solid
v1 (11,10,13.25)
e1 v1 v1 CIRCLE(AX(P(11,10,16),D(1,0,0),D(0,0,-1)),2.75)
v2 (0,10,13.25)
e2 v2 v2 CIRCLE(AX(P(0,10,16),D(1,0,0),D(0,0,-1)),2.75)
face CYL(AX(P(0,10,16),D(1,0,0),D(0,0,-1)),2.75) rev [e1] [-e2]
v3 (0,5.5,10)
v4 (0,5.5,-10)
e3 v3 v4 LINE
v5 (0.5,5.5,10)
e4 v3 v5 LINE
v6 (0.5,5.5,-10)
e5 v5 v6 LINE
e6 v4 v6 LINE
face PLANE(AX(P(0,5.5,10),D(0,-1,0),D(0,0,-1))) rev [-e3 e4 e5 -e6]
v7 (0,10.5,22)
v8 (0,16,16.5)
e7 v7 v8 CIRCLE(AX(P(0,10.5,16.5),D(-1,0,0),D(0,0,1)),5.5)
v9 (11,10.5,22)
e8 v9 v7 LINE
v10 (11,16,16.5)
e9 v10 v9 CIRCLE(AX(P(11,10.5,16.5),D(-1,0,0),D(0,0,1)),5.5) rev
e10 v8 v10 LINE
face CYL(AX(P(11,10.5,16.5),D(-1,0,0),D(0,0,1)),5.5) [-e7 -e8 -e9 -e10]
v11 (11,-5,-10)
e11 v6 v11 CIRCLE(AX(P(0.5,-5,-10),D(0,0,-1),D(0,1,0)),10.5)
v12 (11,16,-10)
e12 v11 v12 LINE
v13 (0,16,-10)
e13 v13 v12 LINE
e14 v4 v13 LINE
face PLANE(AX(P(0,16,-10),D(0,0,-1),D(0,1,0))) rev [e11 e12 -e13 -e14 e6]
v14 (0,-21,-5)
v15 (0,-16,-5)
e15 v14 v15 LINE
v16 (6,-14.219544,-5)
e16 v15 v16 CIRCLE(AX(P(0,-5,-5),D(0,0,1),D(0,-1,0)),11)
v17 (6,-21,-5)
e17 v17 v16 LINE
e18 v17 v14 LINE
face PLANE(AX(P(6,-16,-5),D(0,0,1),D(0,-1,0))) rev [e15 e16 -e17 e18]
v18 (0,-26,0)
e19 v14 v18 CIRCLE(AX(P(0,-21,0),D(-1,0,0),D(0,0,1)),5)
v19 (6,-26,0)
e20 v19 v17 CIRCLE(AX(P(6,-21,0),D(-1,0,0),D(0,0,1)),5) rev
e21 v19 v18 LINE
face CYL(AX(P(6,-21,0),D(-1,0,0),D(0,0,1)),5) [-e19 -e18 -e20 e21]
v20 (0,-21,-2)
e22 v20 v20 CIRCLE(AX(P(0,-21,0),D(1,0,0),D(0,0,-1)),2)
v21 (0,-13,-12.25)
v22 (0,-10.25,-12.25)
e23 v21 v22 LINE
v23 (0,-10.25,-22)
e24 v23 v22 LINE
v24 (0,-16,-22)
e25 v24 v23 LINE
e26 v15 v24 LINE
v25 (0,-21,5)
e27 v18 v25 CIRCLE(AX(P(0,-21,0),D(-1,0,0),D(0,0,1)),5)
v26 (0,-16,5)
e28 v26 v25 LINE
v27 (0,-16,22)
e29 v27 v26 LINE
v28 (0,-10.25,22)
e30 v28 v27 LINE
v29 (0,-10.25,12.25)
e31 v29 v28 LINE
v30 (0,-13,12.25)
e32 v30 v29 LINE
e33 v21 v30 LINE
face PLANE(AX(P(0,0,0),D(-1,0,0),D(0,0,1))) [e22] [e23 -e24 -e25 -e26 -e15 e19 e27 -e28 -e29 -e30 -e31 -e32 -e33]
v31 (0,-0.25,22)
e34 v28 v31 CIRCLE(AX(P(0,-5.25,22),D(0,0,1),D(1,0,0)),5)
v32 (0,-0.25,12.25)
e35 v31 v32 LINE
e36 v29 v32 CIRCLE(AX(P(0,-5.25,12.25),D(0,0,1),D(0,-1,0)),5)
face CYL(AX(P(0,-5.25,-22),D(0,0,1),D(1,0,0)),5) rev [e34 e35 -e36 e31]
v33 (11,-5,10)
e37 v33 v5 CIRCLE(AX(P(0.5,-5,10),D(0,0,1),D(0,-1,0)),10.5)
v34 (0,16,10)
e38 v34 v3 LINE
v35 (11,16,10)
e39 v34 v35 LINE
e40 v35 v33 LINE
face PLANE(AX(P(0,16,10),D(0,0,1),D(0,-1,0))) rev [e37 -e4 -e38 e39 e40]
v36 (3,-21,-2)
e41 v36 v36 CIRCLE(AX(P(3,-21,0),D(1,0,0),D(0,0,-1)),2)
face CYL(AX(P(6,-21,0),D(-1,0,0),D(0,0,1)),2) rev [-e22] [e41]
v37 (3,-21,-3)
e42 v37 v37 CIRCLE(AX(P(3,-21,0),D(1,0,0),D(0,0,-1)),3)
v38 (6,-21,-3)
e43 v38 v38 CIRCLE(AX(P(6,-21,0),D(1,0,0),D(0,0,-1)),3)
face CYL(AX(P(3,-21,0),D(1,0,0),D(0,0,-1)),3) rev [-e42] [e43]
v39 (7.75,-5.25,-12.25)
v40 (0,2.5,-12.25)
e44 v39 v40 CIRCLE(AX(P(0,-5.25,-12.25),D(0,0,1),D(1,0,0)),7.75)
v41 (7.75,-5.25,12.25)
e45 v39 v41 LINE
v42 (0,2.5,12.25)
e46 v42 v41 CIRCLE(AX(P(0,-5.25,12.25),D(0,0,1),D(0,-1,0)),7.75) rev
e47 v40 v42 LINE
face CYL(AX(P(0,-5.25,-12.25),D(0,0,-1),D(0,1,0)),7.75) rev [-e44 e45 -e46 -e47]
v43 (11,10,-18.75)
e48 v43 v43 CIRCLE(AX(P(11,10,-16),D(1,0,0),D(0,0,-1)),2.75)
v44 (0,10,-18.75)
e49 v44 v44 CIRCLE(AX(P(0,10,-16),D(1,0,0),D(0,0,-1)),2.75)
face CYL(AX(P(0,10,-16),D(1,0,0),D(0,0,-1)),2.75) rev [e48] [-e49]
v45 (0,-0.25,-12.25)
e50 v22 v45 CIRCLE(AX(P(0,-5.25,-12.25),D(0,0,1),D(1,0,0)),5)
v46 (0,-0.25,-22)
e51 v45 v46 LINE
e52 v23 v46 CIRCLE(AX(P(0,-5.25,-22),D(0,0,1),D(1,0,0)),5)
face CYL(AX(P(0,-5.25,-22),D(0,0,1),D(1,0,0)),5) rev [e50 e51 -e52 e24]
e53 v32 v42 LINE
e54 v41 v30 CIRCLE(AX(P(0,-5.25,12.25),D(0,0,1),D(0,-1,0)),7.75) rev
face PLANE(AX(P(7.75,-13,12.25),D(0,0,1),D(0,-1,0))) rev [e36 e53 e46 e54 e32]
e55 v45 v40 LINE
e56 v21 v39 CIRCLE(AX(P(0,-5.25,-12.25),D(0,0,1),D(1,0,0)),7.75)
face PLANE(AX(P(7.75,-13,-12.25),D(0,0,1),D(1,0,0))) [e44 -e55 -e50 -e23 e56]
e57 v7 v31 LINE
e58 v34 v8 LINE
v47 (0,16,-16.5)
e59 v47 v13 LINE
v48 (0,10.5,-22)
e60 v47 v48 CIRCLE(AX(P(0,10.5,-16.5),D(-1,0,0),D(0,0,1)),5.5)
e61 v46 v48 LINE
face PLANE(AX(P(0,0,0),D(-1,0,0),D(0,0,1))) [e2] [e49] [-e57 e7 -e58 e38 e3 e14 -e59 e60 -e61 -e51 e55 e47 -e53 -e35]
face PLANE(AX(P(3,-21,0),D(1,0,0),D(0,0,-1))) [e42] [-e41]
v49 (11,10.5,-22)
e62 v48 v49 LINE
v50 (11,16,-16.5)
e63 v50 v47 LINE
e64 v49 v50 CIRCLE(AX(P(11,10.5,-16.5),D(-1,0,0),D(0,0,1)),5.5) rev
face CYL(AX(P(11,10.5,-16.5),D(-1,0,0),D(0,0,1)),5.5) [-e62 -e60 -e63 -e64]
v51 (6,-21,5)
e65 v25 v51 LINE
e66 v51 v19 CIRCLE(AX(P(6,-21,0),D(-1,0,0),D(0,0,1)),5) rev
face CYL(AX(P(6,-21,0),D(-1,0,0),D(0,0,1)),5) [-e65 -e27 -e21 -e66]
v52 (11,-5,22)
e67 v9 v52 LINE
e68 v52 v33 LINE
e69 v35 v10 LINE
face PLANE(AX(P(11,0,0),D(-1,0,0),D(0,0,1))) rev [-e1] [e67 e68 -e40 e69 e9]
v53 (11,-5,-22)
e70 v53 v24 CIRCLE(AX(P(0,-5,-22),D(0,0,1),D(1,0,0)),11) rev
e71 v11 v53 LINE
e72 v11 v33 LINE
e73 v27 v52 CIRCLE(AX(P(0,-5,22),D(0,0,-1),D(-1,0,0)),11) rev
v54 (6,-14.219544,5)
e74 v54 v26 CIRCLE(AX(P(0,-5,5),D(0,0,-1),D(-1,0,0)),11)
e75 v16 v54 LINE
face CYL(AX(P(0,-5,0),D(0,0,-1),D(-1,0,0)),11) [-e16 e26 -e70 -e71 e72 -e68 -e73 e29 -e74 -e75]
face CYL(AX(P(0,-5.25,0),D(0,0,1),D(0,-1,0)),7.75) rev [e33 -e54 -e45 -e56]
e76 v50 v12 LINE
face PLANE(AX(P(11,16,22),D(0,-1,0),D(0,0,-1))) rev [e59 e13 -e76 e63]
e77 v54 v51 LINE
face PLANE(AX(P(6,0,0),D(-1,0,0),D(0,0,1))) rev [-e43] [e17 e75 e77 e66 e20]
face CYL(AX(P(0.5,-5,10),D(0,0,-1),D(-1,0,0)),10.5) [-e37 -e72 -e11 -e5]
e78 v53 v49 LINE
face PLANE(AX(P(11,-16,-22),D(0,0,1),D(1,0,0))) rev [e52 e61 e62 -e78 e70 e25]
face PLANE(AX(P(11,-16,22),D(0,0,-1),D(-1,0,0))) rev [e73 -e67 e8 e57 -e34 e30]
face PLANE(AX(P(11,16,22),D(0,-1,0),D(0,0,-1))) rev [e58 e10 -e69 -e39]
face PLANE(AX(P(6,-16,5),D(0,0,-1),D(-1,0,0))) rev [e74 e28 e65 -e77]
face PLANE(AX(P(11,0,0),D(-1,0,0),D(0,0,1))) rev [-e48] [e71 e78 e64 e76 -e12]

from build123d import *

# Parameters (mm, degrees)
SKETCH1_W               = 44
SKETCH1_H               = 32
BOSS_EXTRUDE1_DEPTH     = 11
SKETCH2_W               = 24.5
SKETCH2_H               = 15.5
CUT_EXTRUDE1_DEPTH      = 7.75
FILLET1_R               = 7.75
CUT_EXTRUDE2_DEPTH      = 40.370833113
CUT_EXTRUDE2_DEPTH_BACK = 40.370833113
SKETCH4_R               = 2.75
SKETCH4_W               = 20
SKETCH4_H               = 10.5
CUT_EXTRUDE3_DEPTH      = 30.342801502
FILLET4_R               = 5.5
SKETCH7_W               = 10
SKETCH7_H               = 10
SKETCH7_R               = 2
BOSS_EXTRUDE5_DEPTH     = 6
FILLET5_R               = 5
CUT_EXTRUDE7_START      = -3
SKETCH9_R               = 3
SKETCH9_R_2             = 2
CUT_EXTRUDE7_DEPTH      = 3
FILLET7_R               = 10.5
FILLET8_R               = 11


# Some blends are built 0.0001 mm under size
with BuildPart() as part:
    # Sketch1 → Boss-Extrude1 (new body)
    with BuildSketch(Plane(origin=(0, 0, 0), x_dir=(0, 0, -1), z_dir=(1, 0, 0))):
        Rectangle(SKETCH1_W, SKETCH1_H)
    extrude(amount=BOSS_EXTRUDE1_DEPTH)

    # Sketch2 → Cut-Extrude1 (cut)
    with BuildSketch(Plane(origin=(0, 0, 0), x_dir=(0, 0, -1), z_dir=(1, 0, 0))):
        with Locations((0, -5.25)):
            Rectangle(SKETCH2_W, SKETCH2_H)
    extrude(amount=CUT_EXTRUDE1_DEPTH, mode=Mode.SUBTRACT)

    # Fillet1
    fillet1_edges = [part.edges().sort_by_distance(p)[0] for p in [
        (7.75, 2.5, 0),
        (7.75, -13, 0),
    ]]
    fillet(fillet1_edges, radius=FILLET1_R - 0.0001)  # a hair under: the kernel refuses the full size

    # Sketch3 → Cut-Extrude2 (cut, two sides: drawn at the far end of the back side and taken through both)
    with BuildSketch(Plane.XY.offset(-12.25).offset(-CUT_EXTRUDE2_DEPTH_BACK)):
        with BuildLine():
            ThreePointArc((0, -10.25), (3.535533906, -8.785533906), (5, -5.25))
            ThreePointArc((5, -5.25), (3.535533906, -1.714466094), (0, -0.25))
            Line((0, -0.25), (0, -10.25))
        make_face()
        with BuildLine():
            Line((0, -10.25), (0, -0.25))
            ThreePointArc((0, -0.25), (-5, -5.25), (0, -10.25))
        make_face()
    extrude(amount=CUT_EXTRUDE2_DEPTH + CUT_EXTRUDE2_DEPTH_BACK, mode=Mode.SUBTRACT)

    # Sketch4 → Cut-Extrude3 (cut, through all)
    with BuildSketch(Plane(origin=(11, 0, 0), x_dir=(0, 0, -1), z_dir=(1, 0, 0))):
        with Locations((-16, 10)):
            Circle(SKETCH4_R)
        with Locations((16, 10)):
            Circle(SKETCH4_R)
        with Locations((0, 10.75)):
            Rectangle(SKETCH4_W, SKETCH4_H)
    extrude(amount=-CUT_EXTRUDE3_DEPTH, mode=Mode.SUBTRACT)

    # Fillet4
    fillet4_edges = [part.edges().sort_by_distance(p)[0] for p in [
        (5.5, 16, 22),
        (5.5, 16, -22),
    ]]
    fillet(fillet4_edges, radius=FILLET4_R)

    # Sketch7 → Boss-Extrude5 (add)
    with BuildSketch(Plane(origin=(0, 0, 0), x_dir=(0, 0, -1), z_dir=(1, 0, 0))):
        with Locations((0, -21)):
            Rectangle(SKETCH7_W, SKETCH7_H)
        with Locations((0, -21)):
            Circle(SKETCH7_R, mode=Mode.SUBTRACT)
    extrude(amount=BOSS_EXTRUDE5_DEPTH)

    # Fillet5
    fillet5_edges = [part.edges().sort_by_distance(p)[0] for p in [
        (3, -26, -5),
        (3, -26, 5),
    ]]
    fillet(fillet5_edges, radius=FILLET5_R - 0.0001)  # a hair under: the kernel refuses the full size

    # Sketch9 → Cut-Extrude7 (cut)
    with BuildSketch(Plane(origin=(6, 0, 0), x_dir=(0, 0, -1), z_dir=(1, 0, 0)).offset(CUT_EXTRUDE7_START)):
        with Locations((0, -21)):
            Circle(SKETCH9_R)
        with Locations((0, -21)):
            Circle(SKETCH9_R_2, mode=Mode.SUBTRACT)
    extrude(amount=CUT_EXTRUDE7_DEPTH, mode=Mode.SUBTRACT)

    # Fillet7
    fillet7_edges = [part.edges().sort_by_distance(p)[0] for p in [
        (11, 5.5, 0),
    ]]
    fillet(fillet7_edges, radius=FILLET7_R)

    # Fillet8
    # the kernel refuses this fillet: 11 mm, written as the material it takes off along each edge
    with BuildSketch(Plane(origin=(11, -16, 49.5), x_dir=(0, 1, 0), z_dir=(0, 0, -1))) as fillet8_piece_1_section:
        with BuildLine():
            CenterArc((FILLET8_R, -FILLET8_R), FILLET8_R, 90, 90)
            Line((0, -FILLET8_R), (0, 0))
            Line((0, 0), (FILLET8_R, 0))
        make_face()
    fillet8_piece_1 = extrude(amount=99, mode=Mode.PRIVATE)
    fillet8_piece_1 = split(fillet8_piece_1, bisect_by=Plane(origin=(6, -13.119412113, 27.25), z_dir=(1, 0, 0)), keep=Keep.TOP, mode=Mode.PRIVATE)
    fillet8_piece_1 = split(fillet8_piece_1, bisect_by=Plane(origin=(9.313036117, -13.119412113, 5), z_dir=(0, 0, 1)), keep=Keep.TOP, mode=Mode.PRIVATE)
    add(fillet8_piece_1, mode=Mode.SUBTRACT)
    with BuildSketch(Plane(origin=(11, -16, 49.5), x_dir=(0, 1, 0), z_dir=(0, 0, -1))) as fillet8_piece_2_section:
        with BuildLine():
            CenterArc((FILLET8_R, -FILLET8_R), FILLET8_R, 90, 90)
            Line((0, -FILLET8_R), (0, 0))
            Line((0, 0), (FILLET8_R, 0))
        make_face()
    fillet8_piece_2 = extrude(amount=99, mode=Mode.PRIVATE)
    fillet8_piece_2 = split(fillet8_piece_2, bisect_by=Plane(origin=(6, -15.650616863, 27.25), z_dir=(-1, 0, 0)), keep=Keep.TOP, mode=Mode.PRIVATE)
    fillet8_piece_2 = split(fillet8_piece_2, bisect_by=Plane(origin=(4.102097244, -15.650616863, 5), z_dir=(0, 0, 1)), keep=Keep.TOP, mode=Mode.PRIVATE)
    add(fillet8_piece_2, mode=Mode.SUBTRACT)
    with BuildSketch(Plane(origin=(11, -16, 49.5), x_dir=(0, 1, 0), z_dir=(0, 0, -1))) as fillet8_piece_3_section:
        with BuildLine():
            CenterArc((FILLET8_R, -FILLET8_R), FILLET8_R, 90, 90)
            Line((0, -FILLET8_R), (0, 0))
            Line((0, 0), (FILLET8_R, 0))
        make_face()
    fillet8_piece_3 = extrude(amount=99, mode=Mode.PRIVATE)
    fillet8_piece_3 = split(fillet8_piece_3, bisect_by=Plane(origin=(6, -13.119412113, 0), z_dir=(1, 0, 0)), keep=Keep.TOP, mode=Mode.PRIVATE)
    fillet8_piece_3 = split(fillet8_piece_3, bisect_by=Plane(origin=(9.313036117, -13.119412113, -5), z_dir=(0, 0, 1)), keep=Keep.TOP, mode=Mode.PRIVATE)
    fillet8_piece_3 = split(fillet8_piece_3, bisect_by=Plane(origin=(9.313036117, -13.119412113, 5), z_dir=(0, 0, -1)), keep=Keep.TOP, mode=Mode.PRIVATE)
    add(fillet8_piece_3, mode=Mode.SUBTRACT)
    with BuildSketch(Plane(origin=(11, -16, 49.5), x_dir=(0, 1, 0), z_dir=(0, 0, -1))) as fillet8_piece_4_section:
        with BuildLine():
            CenterArc((FILLET8_R, -FILLET8_R), FILLET8_R, 90, 90)
            Line((0, -FILLET8_R), (0, 0))
            Line((0, 0), (FILLET8_R, 0))
        make_face()
    fillet8_piece_4 = extrude(amount=99, mode=Mode.PRIVATE)
    fillet8_piece_4 = split(fillet8_piece_4, bisect_by=Plane(origin=(6, -13.119412113, -27.25), z_dir=(1, 0, 0)), keep=Keep.TOP, mode=Mode.PRIVATE)
    fillet8_piece_4 = split(fillet8_piece_4, bisect_by=Plane(origin=(9.313036117, -13.119412113, -5), z_dir=(0, 0, -1)), keep=Keep.TOP, mode=Mode.PRIVATE)
    add(fillet8_piece_4, mode=Mode.SUBTRACT)
    with BuildSketch(Plane(origin=(11, -16, 49.5), x_dir=(0, 1, 0), z_dir=(0, 0, -1))) as fillet8_piece_5_section:
        with BuildLine():
            CenterArc((FILLET8_R, -FILLET8_R), FILLET8_R, 90, 90)
            Line((0, -FILLET8_R), (0, 0))
            Line((0, 0), (FILLET8_R, 0))
        make_face()
    fillet8_piece_5 = extrude(amount=99, mode=Mode.PRIVATE)
    fillet8_piece_5 = split(fillet8_piece_5, bisect_by=Plane(origin=(6, -15.650616863, -27.25), z_dir=(-1, 0, 0)), keep=Keep.TOP, mode=Mode.PRIVATE)
    fillet8_piece_5 = split(fillet8_piece_5, bisect_by=Plane(origin=(4.102097244, -15.650616863, -5), z_dir=(0, 0, -1)), keep=Keep.TOP, mode=Mode.PRIVATE)
    add(fillet8_piece_5, mode=Mode.SUBTRACT)


solid = part.part
